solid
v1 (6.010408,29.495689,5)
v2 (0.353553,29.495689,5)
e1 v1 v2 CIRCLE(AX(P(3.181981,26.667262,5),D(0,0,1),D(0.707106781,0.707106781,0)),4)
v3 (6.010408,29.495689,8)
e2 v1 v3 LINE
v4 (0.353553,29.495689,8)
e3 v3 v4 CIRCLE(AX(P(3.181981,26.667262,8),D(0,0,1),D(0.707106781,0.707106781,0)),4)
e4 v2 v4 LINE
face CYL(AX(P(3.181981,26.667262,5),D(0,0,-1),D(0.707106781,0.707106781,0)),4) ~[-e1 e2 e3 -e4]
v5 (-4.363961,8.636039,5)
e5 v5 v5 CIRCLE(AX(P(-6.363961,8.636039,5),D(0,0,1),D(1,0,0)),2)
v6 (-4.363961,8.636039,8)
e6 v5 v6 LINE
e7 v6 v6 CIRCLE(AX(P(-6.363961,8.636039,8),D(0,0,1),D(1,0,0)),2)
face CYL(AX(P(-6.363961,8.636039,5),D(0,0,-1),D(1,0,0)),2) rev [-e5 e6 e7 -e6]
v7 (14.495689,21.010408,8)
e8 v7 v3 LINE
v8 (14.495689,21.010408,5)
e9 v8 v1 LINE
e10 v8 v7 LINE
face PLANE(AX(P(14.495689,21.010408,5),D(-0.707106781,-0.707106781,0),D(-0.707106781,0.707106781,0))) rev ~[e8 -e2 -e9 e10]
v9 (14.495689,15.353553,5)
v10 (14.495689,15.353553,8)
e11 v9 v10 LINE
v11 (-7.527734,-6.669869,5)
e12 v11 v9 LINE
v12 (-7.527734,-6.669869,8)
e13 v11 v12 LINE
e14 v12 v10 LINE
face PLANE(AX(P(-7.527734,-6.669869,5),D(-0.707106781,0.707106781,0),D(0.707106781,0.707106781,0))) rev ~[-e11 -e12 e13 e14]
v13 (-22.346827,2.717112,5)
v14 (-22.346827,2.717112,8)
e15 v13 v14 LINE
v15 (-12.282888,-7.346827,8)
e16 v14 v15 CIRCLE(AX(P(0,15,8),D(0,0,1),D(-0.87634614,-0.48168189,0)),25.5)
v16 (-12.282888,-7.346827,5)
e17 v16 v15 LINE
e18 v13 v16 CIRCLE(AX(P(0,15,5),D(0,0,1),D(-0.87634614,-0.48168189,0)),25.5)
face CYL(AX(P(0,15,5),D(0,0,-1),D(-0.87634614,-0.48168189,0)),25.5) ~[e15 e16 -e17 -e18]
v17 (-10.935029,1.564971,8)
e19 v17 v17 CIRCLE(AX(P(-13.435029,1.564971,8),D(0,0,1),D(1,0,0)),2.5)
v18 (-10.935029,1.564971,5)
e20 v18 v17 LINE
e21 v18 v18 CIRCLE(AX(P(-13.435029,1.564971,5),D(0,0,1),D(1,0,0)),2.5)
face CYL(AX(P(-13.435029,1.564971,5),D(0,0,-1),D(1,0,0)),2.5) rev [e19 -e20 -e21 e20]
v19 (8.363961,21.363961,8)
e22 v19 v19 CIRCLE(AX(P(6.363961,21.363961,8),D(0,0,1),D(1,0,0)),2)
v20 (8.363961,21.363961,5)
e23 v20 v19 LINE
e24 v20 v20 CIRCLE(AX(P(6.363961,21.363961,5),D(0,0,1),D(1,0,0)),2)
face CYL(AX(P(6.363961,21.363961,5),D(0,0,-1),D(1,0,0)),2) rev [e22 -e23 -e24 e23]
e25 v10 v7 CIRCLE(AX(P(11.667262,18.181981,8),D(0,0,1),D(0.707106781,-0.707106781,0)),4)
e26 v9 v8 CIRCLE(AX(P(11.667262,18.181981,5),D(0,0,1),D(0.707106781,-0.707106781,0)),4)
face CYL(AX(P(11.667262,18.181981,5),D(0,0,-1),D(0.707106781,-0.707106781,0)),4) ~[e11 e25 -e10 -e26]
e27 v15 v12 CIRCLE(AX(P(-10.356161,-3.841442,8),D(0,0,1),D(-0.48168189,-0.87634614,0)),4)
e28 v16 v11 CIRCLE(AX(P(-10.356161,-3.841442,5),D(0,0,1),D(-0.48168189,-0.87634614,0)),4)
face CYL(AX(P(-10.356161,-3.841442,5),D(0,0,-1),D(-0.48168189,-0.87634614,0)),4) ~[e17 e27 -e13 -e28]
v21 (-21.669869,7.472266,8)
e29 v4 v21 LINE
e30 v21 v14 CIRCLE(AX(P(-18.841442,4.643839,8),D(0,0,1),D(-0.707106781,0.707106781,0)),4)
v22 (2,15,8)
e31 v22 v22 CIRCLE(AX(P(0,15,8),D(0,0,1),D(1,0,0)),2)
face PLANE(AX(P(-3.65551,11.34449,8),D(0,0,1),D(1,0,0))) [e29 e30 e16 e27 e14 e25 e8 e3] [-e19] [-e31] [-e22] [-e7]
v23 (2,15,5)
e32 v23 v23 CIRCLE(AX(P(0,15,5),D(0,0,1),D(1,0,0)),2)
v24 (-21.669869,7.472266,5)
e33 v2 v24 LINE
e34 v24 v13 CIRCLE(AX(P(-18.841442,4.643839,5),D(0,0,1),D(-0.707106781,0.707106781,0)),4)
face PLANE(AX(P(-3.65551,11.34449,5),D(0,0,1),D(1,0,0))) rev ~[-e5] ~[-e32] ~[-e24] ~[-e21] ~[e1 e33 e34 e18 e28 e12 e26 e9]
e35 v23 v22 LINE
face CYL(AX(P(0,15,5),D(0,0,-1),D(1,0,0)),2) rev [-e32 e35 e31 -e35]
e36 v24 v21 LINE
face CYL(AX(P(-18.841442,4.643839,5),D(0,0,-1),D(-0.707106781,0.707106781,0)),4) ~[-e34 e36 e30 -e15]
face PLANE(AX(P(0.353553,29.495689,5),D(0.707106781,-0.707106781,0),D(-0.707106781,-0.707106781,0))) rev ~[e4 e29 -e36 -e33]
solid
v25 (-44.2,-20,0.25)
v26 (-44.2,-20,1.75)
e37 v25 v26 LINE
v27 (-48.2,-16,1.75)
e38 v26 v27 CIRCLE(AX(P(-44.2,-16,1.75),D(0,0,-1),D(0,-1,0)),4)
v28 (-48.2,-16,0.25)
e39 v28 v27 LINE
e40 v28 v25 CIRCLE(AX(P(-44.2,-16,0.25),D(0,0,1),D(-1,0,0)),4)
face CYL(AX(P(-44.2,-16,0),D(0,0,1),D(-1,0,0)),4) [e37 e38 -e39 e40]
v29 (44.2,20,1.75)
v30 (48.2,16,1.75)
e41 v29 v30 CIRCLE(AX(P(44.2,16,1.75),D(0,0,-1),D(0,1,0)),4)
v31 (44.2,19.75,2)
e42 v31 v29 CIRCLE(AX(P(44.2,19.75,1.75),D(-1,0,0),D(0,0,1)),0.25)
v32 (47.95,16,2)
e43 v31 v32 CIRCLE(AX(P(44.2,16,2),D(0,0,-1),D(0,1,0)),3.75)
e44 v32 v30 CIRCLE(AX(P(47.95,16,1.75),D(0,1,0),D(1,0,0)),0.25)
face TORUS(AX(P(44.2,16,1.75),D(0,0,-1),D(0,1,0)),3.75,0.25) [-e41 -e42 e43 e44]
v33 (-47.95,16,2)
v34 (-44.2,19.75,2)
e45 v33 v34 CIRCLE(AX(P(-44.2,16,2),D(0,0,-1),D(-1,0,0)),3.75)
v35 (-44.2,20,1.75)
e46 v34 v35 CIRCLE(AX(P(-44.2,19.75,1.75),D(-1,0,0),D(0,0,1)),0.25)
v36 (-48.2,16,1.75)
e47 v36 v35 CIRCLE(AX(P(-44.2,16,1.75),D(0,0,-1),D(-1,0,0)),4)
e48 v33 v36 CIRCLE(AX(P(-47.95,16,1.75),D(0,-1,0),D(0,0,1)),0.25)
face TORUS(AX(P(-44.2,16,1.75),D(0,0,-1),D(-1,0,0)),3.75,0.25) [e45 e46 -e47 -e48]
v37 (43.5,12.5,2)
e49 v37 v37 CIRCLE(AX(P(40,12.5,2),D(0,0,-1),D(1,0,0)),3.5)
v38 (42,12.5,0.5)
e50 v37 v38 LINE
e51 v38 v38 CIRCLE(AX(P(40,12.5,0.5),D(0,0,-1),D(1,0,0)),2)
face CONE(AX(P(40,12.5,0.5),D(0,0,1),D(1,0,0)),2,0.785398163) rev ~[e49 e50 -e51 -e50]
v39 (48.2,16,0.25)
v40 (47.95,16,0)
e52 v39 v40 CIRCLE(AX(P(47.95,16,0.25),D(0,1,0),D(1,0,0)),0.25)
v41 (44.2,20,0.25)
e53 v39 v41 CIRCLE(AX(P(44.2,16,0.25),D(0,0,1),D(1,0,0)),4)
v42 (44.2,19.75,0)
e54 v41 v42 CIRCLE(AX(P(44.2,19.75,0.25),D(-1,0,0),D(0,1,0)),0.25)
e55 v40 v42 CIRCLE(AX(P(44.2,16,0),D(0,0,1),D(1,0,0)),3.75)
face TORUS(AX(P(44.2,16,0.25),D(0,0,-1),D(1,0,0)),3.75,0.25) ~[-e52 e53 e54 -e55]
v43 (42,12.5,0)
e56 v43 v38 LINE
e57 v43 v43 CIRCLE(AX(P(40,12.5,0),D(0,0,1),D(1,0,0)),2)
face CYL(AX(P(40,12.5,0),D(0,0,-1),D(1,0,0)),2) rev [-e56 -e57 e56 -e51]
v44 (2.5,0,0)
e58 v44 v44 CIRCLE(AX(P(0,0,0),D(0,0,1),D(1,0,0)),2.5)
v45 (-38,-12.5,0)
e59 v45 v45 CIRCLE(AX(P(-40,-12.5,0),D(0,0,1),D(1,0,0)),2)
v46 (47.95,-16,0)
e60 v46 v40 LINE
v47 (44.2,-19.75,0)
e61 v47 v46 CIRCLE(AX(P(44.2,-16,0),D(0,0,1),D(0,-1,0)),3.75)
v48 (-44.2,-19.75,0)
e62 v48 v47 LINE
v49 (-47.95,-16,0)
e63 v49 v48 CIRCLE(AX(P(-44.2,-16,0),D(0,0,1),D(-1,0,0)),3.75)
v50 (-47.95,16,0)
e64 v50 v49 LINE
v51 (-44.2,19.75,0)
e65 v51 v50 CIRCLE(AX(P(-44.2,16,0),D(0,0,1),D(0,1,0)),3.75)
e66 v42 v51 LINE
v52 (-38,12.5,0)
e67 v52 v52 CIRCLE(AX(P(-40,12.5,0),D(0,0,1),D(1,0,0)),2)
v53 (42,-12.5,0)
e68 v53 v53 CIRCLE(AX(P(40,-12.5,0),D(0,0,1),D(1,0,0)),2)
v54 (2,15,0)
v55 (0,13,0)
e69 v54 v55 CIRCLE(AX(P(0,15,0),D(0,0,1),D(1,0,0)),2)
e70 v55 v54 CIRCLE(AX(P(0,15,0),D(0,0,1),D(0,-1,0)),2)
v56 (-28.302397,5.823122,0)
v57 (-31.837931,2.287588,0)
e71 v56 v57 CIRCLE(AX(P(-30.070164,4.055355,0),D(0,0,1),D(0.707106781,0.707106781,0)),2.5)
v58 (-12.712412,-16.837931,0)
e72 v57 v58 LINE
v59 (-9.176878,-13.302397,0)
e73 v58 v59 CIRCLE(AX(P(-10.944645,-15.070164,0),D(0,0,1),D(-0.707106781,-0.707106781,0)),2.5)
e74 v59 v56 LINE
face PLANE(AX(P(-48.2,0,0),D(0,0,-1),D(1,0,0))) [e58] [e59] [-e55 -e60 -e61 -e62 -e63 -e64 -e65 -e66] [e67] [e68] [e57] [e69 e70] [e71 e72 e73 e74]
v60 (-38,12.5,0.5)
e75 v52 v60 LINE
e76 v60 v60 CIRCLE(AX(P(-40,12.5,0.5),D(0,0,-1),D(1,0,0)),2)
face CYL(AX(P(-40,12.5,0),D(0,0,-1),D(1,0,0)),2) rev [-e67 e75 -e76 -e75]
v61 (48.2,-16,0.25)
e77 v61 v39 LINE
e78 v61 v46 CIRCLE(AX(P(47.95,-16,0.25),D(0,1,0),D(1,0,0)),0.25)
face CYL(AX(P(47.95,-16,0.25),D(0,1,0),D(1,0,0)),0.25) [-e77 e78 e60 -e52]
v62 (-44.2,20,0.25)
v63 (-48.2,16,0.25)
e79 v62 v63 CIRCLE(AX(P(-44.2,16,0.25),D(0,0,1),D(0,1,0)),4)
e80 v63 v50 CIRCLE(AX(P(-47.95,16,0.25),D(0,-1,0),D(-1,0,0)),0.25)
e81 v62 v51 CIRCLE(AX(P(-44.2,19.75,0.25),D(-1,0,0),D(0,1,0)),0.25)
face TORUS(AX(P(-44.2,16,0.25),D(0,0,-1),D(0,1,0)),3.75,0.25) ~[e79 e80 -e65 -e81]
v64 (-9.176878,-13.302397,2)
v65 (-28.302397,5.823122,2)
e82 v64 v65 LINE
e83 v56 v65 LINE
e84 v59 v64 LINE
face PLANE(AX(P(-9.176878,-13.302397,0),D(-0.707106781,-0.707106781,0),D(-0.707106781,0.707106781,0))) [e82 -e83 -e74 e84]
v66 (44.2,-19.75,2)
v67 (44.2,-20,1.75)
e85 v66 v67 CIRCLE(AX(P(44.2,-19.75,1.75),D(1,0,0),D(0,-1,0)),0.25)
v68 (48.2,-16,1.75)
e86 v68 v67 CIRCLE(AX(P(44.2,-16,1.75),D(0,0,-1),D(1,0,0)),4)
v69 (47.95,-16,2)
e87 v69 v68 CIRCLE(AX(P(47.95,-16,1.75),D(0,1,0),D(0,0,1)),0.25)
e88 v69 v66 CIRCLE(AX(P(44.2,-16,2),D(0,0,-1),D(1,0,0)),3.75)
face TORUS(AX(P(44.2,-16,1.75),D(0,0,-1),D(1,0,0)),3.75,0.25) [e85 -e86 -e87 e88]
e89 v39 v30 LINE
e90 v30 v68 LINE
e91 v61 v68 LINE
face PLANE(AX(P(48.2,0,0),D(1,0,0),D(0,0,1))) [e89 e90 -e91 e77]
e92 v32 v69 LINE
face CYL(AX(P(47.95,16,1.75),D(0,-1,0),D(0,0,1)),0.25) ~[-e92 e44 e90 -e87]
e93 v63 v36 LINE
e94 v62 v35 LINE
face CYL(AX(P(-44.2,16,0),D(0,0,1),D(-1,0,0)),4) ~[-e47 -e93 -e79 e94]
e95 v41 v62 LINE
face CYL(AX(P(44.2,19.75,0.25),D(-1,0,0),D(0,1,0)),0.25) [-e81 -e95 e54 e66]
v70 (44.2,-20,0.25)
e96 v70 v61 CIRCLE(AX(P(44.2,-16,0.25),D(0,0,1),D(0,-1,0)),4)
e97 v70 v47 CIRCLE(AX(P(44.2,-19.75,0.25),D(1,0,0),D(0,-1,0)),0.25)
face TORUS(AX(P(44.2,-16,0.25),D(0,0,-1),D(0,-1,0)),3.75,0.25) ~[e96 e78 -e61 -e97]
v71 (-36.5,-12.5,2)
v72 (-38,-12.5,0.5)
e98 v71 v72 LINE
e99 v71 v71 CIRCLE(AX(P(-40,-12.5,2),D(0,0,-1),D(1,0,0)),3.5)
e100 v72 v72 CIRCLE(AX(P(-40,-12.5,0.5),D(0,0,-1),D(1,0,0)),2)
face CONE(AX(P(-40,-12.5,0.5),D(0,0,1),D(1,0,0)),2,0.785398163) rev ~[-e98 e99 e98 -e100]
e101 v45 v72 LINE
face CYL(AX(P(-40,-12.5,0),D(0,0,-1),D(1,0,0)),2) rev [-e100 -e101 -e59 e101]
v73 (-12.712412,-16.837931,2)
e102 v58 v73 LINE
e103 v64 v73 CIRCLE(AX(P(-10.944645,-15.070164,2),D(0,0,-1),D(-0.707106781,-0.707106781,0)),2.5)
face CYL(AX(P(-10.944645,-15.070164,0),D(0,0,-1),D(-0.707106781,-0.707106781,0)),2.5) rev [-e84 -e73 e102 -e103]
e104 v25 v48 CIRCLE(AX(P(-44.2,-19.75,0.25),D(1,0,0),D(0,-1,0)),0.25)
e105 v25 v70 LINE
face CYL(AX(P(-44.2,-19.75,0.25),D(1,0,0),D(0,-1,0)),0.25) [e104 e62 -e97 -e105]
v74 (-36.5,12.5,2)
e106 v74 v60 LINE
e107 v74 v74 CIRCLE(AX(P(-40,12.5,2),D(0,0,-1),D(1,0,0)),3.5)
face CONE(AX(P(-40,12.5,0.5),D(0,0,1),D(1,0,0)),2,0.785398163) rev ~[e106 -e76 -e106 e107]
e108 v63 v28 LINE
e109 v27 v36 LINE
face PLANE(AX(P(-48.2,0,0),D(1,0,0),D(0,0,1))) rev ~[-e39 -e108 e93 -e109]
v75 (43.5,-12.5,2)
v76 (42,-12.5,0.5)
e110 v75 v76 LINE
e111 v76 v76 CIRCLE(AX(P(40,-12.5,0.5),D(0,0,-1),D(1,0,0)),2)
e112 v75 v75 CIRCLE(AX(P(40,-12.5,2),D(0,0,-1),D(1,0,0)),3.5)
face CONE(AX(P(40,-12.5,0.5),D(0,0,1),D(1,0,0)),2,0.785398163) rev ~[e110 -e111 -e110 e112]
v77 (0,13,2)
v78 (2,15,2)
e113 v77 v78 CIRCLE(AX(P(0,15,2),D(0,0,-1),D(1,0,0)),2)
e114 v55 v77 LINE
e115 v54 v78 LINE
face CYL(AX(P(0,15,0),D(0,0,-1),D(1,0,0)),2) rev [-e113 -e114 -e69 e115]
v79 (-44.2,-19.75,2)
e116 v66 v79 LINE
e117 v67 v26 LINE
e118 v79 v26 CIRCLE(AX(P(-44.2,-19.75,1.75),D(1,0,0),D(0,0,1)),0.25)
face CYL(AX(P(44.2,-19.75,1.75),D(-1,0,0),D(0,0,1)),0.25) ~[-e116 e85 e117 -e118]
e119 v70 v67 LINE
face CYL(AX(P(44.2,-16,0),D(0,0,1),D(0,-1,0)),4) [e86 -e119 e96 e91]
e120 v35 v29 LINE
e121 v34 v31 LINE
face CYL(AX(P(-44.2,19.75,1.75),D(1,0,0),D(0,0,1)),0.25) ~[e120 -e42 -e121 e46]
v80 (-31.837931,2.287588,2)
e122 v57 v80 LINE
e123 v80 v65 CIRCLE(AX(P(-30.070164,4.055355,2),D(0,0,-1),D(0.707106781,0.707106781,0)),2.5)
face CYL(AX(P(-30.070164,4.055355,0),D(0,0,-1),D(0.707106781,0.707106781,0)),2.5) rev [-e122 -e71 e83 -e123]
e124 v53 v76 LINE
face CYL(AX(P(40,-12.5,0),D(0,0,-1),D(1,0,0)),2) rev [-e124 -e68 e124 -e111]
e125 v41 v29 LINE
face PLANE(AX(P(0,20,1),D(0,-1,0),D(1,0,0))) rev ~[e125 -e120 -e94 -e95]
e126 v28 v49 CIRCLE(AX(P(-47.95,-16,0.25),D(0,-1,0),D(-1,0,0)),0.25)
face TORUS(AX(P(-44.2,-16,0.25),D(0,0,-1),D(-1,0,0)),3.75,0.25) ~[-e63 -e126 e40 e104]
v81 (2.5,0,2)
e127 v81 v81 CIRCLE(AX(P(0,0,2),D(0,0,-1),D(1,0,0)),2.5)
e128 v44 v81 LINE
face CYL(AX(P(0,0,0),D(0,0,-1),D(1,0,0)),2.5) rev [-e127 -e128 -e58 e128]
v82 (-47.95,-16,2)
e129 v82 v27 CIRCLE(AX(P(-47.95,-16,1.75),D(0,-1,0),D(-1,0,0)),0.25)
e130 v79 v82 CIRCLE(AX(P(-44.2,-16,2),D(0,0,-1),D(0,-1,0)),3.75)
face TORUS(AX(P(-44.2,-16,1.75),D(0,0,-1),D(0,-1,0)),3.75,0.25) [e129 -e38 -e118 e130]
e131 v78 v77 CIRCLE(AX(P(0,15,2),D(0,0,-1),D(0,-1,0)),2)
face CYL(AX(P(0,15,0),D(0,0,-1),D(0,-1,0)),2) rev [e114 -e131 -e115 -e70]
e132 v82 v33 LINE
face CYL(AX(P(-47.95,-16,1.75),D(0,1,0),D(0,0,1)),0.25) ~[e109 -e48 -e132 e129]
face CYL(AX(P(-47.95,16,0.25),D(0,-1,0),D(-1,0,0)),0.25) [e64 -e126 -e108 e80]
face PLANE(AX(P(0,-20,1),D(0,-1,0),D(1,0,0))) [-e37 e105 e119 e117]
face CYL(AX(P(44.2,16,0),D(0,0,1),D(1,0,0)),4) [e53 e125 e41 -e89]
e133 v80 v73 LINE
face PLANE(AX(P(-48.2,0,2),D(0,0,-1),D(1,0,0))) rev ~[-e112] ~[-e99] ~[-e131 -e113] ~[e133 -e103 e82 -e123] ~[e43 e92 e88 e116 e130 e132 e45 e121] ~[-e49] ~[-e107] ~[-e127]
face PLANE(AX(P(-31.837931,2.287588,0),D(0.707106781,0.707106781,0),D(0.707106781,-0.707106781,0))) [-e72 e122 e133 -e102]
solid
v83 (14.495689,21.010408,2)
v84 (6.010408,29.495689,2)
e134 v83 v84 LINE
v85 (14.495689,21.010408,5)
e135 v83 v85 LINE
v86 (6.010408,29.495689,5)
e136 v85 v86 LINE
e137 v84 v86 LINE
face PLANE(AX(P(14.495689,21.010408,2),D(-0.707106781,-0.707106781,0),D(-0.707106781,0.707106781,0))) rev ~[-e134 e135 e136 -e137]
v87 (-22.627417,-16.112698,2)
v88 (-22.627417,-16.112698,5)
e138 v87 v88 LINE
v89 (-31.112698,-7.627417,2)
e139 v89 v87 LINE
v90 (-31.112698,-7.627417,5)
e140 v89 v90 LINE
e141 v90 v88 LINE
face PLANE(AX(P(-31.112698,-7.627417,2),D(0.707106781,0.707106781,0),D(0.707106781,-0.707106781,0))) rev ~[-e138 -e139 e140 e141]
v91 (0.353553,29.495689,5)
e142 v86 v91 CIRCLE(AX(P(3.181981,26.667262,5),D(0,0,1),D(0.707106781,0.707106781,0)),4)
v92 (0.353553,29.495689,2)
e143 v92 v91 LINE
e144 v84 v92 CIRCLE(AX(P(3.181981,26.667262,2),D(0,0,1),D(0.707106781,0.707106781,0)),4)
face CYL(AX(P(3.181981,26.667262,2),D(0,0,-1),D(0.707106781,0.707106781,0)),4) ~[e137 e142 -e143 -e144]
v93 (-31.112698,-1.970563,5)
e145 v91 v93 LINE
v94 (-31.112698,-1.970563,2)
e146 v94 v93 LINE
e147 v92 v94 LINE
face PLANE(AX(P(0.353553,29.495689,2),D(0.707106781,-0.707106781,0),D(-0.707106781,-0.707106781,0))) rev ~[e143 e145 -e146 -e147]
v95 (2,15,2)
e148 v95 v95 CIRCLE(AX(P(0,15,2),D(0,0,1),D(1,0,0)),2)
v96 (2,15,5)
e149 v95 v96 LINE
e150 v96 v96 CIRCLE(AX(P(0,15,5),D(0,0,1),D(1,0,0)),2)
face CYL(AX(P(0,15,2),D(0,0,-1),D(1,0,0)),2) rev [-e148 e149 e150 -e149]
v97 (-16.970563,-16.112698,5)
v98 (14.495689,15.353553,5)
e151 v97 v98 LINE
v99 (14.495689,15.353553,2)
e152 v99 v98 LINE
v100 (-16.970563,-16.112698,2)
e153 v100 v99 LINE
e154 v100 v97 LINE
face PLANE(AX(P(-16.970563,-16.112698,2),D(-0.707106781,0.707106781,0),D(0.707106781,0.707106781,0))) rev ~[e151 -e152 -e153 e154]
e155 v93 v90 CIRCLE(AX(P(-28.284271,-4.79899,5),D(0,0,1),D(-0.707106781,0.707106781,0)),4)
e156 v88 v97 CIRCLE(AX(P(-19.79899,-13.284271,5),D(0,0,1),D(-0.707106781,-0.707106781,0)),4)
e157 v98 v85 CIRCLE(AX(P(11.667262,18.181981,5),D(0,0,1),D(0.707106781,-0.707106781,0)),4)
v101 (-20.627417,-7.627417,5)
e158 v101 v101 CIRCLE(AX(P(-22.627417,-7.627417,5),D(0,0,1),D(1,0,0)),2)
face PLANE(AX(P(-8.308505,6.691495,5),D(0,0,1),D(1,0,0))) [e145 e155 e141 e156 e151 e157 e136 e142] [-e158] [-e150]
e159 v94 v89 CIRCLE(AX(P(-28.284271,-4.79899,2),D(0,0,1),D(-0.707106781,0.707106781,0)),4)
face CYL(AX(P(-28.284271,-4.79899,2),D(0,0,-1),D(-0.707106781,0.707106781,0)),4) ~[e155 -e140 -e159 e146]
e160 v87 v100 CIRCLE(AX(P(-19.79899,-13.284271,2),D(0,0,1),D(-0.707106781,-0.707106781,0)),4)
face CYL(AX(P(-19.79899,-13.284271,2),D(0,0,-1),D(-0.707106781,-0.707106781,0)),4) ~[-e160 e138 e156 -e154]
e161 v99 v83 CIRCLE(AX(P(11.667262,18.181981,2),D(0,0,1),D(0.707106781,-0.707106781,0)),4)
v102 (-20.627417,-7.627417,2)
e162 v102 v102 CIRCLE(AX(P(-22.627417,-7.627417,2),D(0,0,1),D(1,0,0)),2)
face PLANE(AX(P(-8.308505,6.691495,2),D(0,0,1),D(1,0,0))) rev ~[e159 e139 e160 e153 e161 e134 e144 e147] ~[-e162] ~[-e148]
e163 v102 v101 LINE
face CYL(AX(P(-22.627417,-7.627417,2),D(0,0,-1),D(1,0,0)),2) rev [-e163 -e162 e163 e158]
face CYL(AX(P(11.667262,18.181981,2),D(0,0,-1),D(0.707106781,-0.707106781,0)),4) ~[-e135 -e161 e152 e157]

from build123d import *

# Parameters (mm, degrees)
F0_W      = 96.4
F0_H      = 2
F1_DEPTH  = 20
F2_R      = 4
F3_R      = 0.25
F4_R      = 2
F4_R_2    = 2.5
F5_DEPTH  = 2.0010001
F6_SIZE   = 1.5
F8_DEPTH  = 2.0010001
F9_R      = 2
F10_DEPTH = 3
F11_R     = 2.5
F11_R_2   = 2
F12_DEPTH = 3


# Not quite as in the source:
# - a feature names something its author has since deleted; it is built from what else it names


with BuildPart() as f1:
    # F0 (on Front) → F1 (new body, symmetric)
    with BuildSketch(Plane.XZ):
        with Locations((0, 1)):
            Rectangle(F0_W, F0_H)
    extrude(amount=F1_DEPTH, both=True)

    # F2
    f2_edges = [f1.edges().sort_by_distance(p)[0] for p in [
        (-48.2, -20, 1),
        (48.2, -20, 1),
        (48.2, 20, 1),
        (-48.2, 20, 1),
    ]]
    fillet(f2_edges, radius=F2_R)

    # F3
    f3_edges = [f1.edges().sort_by_distance(p)[0] for p in [
        (0, 20, 2),
        (47.028427, 18.828427, 2),
        (-47.028427, 18.828427, 2),
        (48.2, 0, 2),
        (-48.2, 0, 2),
        (47.028427, -18.828427, 2),
        (-47.028427, -18.828427, 2),
        (0, -20, 2),
        (-48.2, 0, 0),
        (-47.028427, 18.828427, 0),
        (-47.028427, -18.828427, 0),
        (0, 20, 0),
        (0, -20, 0),
        (47.028427, 18.828427, 0),
        (47.028427, -18.828427, 0),
        (48.2, 0, 0),
    ]]
    fillet(f3_edges, radius=F3_R)

    # F4 (on Top) → F5 (cut, through all)
    with BuildSketch(Plane.XY):
        with Locations((-40, 12.5)):
            Circle(F4_R)
        with Locations((-40, -12.5)):
            Circle(F4_R)
        with Locations((40, 12.5)):
            Circle(F4_R)
        with Locations((40, -12.5)):
            Circle(F4_R)
        Circle(F4_R_2)
    extrude(amount=F5_DEPTH, mode=Mode.SUBTRACT)

    # F6
    f6_edges = [f1.edges().sort_by_distance(p)[0] for p in [
        (-42, 12.5, 2),
        (-42, -12.5, 2),
        (38, -12.5, 2),
        (38, 12.5, 2),
    ]]
    chamfer(f6_edges, length=F6_SIZE)

    # F7 (on Top) → F8 (cut, through all)
    with BuildSketch(Plane.XY):
        with BuildLine():
            ThreePointArc((0, 13), (1.4142135624, 13.5857864376), (2, 15))
            ThreePointArc((2, 15), (-1.4142135624, 16.4142135624), (0, 13))
        make_face()
        with BuildLine():
            Line((-9.1768776335, -13.3023969122), (-28.3023969122, 5.8231223665))
            ThreePointArc((-28.3023969122, 5.8231223665), (-31.8379308181, 5.8231223665), (-31.8379308181, 2.2875884606))
            Line((-31.8379308181, 2.2875884606), (-12.7124115394, -16.8379308181))
            ThreePointArc((-12.7124115394, -16.8379308181), (-9.1768776335, -16.8379308181), (-9.1768776335, -13.3023969122))
        make_face()
    extrude(amount=F8_DEPTH, mode=Mode.SUBTRACT)


with BuildPart() as f10:
    # F9 (on face) → F10 (new body)
    with BuildSketch(Plane.XY.offset(2)):
        with BuildLine():
            Line((0.3535533906, 29.4956890143), (-31.1126983722, -1.9705627485))
            ThreePointArc((-31.1126983722, -1.9705627485), (-32.2842712475, -4.7989898732), (-31.1126983722, -7.627416998))
            Line((-31.1126983722, -7.627416998), (-22.627416998, -16.1126983722))
            ThreePointArc((-22.627416998, -16.1126983722), (-19.7989898732, -17.2842712475), (-16.9705627485, -16.1126983722))
            Line((-16.9705627485, -16.1126983722), (14.4956890143, 15.3535533906))
            ThreePointArc((14.4956890143, 15.3535533906), (15.6672618896, 18.1819805153), (14.4956890143, 21.0104076401))
            Line((14.4956890143, 21.0104076401), (6.0104076401, 29.4956890143))
            ThreePointArc((6.0104076401, 29.4956890143), (3.1819805153, 30.6672618896), (0.3535533906, 29.4956890143))
        make_face()
        with Locations((-22.627416998, -7.627416998)):
            Circle(F9_R, mode=Mode.SUBTRACT)
        with Locations((0, 15)):
            Circle(F9_R, mode=Mode.SUBTRACT)
    extrude(amount=F10_DEPTH)


with BuildPart() as f12:
    # F11 (on face) → F12 (new body)
    with BuildSketch(Plane.XY.offset(5)):
        with BuildLine():
            Line((0.3535533906, 29.4956890143), (-21.6698691325, 7.4722664912))
            ThreePointArc((-21.6698691325, 7.4722664912), (-22.8015135515, 5.2076064891), (-22.3468265674, 2.7171118067))
            ThreePointArc((-22.3468265674, 2.7171118067), (-18.0312229203, -3.0312229203), (-12.2828881933, -7.3468265674))
            ThreePointArc((-12.2828881933, -7.3468265674), (-9.7923935109, -7.8015135515), (-7.5277335088, -6.6698691325))
            Line((-7.5277335088, -6.6698691325), (14.4956890143, 15.3535533906))
            ThreePointArc((14.4956890143, 15.3535533906), (15.6672618896, 18.1819805153), (14.4956890143, 21.0104076401))
            Line((14.4956890143, 21.0104076401), (6.0104076401, 29.4956890143))
            ThreePointArc((6.0104076401, 29.4956890143), (3.1819805153, 30.6672618896), (0.3535533906, 29.4956890143))
        make_face()
        with Locations((-13.4350288425, 1.5649711575)):
            Circle(F11_R, mode=Mode.SUBTRACT)
        with Locations((-6.3639610307, 8.6360389693)):
            Circle(F11_R_2, mode=Mode.SUBTRACT)
        with Locations((0, 15)):
            Circle(F11_R_2, mode=Mode.SUBTRACT)
        with Locations((6.3639610307, 21.3639610307)):
            Circle(F11_R_2, mode=Mode.SUBTRACT)
    extrude(amount=F12_DEPTH)


solid = Compound([f1.part, f10.part, f12.part])
